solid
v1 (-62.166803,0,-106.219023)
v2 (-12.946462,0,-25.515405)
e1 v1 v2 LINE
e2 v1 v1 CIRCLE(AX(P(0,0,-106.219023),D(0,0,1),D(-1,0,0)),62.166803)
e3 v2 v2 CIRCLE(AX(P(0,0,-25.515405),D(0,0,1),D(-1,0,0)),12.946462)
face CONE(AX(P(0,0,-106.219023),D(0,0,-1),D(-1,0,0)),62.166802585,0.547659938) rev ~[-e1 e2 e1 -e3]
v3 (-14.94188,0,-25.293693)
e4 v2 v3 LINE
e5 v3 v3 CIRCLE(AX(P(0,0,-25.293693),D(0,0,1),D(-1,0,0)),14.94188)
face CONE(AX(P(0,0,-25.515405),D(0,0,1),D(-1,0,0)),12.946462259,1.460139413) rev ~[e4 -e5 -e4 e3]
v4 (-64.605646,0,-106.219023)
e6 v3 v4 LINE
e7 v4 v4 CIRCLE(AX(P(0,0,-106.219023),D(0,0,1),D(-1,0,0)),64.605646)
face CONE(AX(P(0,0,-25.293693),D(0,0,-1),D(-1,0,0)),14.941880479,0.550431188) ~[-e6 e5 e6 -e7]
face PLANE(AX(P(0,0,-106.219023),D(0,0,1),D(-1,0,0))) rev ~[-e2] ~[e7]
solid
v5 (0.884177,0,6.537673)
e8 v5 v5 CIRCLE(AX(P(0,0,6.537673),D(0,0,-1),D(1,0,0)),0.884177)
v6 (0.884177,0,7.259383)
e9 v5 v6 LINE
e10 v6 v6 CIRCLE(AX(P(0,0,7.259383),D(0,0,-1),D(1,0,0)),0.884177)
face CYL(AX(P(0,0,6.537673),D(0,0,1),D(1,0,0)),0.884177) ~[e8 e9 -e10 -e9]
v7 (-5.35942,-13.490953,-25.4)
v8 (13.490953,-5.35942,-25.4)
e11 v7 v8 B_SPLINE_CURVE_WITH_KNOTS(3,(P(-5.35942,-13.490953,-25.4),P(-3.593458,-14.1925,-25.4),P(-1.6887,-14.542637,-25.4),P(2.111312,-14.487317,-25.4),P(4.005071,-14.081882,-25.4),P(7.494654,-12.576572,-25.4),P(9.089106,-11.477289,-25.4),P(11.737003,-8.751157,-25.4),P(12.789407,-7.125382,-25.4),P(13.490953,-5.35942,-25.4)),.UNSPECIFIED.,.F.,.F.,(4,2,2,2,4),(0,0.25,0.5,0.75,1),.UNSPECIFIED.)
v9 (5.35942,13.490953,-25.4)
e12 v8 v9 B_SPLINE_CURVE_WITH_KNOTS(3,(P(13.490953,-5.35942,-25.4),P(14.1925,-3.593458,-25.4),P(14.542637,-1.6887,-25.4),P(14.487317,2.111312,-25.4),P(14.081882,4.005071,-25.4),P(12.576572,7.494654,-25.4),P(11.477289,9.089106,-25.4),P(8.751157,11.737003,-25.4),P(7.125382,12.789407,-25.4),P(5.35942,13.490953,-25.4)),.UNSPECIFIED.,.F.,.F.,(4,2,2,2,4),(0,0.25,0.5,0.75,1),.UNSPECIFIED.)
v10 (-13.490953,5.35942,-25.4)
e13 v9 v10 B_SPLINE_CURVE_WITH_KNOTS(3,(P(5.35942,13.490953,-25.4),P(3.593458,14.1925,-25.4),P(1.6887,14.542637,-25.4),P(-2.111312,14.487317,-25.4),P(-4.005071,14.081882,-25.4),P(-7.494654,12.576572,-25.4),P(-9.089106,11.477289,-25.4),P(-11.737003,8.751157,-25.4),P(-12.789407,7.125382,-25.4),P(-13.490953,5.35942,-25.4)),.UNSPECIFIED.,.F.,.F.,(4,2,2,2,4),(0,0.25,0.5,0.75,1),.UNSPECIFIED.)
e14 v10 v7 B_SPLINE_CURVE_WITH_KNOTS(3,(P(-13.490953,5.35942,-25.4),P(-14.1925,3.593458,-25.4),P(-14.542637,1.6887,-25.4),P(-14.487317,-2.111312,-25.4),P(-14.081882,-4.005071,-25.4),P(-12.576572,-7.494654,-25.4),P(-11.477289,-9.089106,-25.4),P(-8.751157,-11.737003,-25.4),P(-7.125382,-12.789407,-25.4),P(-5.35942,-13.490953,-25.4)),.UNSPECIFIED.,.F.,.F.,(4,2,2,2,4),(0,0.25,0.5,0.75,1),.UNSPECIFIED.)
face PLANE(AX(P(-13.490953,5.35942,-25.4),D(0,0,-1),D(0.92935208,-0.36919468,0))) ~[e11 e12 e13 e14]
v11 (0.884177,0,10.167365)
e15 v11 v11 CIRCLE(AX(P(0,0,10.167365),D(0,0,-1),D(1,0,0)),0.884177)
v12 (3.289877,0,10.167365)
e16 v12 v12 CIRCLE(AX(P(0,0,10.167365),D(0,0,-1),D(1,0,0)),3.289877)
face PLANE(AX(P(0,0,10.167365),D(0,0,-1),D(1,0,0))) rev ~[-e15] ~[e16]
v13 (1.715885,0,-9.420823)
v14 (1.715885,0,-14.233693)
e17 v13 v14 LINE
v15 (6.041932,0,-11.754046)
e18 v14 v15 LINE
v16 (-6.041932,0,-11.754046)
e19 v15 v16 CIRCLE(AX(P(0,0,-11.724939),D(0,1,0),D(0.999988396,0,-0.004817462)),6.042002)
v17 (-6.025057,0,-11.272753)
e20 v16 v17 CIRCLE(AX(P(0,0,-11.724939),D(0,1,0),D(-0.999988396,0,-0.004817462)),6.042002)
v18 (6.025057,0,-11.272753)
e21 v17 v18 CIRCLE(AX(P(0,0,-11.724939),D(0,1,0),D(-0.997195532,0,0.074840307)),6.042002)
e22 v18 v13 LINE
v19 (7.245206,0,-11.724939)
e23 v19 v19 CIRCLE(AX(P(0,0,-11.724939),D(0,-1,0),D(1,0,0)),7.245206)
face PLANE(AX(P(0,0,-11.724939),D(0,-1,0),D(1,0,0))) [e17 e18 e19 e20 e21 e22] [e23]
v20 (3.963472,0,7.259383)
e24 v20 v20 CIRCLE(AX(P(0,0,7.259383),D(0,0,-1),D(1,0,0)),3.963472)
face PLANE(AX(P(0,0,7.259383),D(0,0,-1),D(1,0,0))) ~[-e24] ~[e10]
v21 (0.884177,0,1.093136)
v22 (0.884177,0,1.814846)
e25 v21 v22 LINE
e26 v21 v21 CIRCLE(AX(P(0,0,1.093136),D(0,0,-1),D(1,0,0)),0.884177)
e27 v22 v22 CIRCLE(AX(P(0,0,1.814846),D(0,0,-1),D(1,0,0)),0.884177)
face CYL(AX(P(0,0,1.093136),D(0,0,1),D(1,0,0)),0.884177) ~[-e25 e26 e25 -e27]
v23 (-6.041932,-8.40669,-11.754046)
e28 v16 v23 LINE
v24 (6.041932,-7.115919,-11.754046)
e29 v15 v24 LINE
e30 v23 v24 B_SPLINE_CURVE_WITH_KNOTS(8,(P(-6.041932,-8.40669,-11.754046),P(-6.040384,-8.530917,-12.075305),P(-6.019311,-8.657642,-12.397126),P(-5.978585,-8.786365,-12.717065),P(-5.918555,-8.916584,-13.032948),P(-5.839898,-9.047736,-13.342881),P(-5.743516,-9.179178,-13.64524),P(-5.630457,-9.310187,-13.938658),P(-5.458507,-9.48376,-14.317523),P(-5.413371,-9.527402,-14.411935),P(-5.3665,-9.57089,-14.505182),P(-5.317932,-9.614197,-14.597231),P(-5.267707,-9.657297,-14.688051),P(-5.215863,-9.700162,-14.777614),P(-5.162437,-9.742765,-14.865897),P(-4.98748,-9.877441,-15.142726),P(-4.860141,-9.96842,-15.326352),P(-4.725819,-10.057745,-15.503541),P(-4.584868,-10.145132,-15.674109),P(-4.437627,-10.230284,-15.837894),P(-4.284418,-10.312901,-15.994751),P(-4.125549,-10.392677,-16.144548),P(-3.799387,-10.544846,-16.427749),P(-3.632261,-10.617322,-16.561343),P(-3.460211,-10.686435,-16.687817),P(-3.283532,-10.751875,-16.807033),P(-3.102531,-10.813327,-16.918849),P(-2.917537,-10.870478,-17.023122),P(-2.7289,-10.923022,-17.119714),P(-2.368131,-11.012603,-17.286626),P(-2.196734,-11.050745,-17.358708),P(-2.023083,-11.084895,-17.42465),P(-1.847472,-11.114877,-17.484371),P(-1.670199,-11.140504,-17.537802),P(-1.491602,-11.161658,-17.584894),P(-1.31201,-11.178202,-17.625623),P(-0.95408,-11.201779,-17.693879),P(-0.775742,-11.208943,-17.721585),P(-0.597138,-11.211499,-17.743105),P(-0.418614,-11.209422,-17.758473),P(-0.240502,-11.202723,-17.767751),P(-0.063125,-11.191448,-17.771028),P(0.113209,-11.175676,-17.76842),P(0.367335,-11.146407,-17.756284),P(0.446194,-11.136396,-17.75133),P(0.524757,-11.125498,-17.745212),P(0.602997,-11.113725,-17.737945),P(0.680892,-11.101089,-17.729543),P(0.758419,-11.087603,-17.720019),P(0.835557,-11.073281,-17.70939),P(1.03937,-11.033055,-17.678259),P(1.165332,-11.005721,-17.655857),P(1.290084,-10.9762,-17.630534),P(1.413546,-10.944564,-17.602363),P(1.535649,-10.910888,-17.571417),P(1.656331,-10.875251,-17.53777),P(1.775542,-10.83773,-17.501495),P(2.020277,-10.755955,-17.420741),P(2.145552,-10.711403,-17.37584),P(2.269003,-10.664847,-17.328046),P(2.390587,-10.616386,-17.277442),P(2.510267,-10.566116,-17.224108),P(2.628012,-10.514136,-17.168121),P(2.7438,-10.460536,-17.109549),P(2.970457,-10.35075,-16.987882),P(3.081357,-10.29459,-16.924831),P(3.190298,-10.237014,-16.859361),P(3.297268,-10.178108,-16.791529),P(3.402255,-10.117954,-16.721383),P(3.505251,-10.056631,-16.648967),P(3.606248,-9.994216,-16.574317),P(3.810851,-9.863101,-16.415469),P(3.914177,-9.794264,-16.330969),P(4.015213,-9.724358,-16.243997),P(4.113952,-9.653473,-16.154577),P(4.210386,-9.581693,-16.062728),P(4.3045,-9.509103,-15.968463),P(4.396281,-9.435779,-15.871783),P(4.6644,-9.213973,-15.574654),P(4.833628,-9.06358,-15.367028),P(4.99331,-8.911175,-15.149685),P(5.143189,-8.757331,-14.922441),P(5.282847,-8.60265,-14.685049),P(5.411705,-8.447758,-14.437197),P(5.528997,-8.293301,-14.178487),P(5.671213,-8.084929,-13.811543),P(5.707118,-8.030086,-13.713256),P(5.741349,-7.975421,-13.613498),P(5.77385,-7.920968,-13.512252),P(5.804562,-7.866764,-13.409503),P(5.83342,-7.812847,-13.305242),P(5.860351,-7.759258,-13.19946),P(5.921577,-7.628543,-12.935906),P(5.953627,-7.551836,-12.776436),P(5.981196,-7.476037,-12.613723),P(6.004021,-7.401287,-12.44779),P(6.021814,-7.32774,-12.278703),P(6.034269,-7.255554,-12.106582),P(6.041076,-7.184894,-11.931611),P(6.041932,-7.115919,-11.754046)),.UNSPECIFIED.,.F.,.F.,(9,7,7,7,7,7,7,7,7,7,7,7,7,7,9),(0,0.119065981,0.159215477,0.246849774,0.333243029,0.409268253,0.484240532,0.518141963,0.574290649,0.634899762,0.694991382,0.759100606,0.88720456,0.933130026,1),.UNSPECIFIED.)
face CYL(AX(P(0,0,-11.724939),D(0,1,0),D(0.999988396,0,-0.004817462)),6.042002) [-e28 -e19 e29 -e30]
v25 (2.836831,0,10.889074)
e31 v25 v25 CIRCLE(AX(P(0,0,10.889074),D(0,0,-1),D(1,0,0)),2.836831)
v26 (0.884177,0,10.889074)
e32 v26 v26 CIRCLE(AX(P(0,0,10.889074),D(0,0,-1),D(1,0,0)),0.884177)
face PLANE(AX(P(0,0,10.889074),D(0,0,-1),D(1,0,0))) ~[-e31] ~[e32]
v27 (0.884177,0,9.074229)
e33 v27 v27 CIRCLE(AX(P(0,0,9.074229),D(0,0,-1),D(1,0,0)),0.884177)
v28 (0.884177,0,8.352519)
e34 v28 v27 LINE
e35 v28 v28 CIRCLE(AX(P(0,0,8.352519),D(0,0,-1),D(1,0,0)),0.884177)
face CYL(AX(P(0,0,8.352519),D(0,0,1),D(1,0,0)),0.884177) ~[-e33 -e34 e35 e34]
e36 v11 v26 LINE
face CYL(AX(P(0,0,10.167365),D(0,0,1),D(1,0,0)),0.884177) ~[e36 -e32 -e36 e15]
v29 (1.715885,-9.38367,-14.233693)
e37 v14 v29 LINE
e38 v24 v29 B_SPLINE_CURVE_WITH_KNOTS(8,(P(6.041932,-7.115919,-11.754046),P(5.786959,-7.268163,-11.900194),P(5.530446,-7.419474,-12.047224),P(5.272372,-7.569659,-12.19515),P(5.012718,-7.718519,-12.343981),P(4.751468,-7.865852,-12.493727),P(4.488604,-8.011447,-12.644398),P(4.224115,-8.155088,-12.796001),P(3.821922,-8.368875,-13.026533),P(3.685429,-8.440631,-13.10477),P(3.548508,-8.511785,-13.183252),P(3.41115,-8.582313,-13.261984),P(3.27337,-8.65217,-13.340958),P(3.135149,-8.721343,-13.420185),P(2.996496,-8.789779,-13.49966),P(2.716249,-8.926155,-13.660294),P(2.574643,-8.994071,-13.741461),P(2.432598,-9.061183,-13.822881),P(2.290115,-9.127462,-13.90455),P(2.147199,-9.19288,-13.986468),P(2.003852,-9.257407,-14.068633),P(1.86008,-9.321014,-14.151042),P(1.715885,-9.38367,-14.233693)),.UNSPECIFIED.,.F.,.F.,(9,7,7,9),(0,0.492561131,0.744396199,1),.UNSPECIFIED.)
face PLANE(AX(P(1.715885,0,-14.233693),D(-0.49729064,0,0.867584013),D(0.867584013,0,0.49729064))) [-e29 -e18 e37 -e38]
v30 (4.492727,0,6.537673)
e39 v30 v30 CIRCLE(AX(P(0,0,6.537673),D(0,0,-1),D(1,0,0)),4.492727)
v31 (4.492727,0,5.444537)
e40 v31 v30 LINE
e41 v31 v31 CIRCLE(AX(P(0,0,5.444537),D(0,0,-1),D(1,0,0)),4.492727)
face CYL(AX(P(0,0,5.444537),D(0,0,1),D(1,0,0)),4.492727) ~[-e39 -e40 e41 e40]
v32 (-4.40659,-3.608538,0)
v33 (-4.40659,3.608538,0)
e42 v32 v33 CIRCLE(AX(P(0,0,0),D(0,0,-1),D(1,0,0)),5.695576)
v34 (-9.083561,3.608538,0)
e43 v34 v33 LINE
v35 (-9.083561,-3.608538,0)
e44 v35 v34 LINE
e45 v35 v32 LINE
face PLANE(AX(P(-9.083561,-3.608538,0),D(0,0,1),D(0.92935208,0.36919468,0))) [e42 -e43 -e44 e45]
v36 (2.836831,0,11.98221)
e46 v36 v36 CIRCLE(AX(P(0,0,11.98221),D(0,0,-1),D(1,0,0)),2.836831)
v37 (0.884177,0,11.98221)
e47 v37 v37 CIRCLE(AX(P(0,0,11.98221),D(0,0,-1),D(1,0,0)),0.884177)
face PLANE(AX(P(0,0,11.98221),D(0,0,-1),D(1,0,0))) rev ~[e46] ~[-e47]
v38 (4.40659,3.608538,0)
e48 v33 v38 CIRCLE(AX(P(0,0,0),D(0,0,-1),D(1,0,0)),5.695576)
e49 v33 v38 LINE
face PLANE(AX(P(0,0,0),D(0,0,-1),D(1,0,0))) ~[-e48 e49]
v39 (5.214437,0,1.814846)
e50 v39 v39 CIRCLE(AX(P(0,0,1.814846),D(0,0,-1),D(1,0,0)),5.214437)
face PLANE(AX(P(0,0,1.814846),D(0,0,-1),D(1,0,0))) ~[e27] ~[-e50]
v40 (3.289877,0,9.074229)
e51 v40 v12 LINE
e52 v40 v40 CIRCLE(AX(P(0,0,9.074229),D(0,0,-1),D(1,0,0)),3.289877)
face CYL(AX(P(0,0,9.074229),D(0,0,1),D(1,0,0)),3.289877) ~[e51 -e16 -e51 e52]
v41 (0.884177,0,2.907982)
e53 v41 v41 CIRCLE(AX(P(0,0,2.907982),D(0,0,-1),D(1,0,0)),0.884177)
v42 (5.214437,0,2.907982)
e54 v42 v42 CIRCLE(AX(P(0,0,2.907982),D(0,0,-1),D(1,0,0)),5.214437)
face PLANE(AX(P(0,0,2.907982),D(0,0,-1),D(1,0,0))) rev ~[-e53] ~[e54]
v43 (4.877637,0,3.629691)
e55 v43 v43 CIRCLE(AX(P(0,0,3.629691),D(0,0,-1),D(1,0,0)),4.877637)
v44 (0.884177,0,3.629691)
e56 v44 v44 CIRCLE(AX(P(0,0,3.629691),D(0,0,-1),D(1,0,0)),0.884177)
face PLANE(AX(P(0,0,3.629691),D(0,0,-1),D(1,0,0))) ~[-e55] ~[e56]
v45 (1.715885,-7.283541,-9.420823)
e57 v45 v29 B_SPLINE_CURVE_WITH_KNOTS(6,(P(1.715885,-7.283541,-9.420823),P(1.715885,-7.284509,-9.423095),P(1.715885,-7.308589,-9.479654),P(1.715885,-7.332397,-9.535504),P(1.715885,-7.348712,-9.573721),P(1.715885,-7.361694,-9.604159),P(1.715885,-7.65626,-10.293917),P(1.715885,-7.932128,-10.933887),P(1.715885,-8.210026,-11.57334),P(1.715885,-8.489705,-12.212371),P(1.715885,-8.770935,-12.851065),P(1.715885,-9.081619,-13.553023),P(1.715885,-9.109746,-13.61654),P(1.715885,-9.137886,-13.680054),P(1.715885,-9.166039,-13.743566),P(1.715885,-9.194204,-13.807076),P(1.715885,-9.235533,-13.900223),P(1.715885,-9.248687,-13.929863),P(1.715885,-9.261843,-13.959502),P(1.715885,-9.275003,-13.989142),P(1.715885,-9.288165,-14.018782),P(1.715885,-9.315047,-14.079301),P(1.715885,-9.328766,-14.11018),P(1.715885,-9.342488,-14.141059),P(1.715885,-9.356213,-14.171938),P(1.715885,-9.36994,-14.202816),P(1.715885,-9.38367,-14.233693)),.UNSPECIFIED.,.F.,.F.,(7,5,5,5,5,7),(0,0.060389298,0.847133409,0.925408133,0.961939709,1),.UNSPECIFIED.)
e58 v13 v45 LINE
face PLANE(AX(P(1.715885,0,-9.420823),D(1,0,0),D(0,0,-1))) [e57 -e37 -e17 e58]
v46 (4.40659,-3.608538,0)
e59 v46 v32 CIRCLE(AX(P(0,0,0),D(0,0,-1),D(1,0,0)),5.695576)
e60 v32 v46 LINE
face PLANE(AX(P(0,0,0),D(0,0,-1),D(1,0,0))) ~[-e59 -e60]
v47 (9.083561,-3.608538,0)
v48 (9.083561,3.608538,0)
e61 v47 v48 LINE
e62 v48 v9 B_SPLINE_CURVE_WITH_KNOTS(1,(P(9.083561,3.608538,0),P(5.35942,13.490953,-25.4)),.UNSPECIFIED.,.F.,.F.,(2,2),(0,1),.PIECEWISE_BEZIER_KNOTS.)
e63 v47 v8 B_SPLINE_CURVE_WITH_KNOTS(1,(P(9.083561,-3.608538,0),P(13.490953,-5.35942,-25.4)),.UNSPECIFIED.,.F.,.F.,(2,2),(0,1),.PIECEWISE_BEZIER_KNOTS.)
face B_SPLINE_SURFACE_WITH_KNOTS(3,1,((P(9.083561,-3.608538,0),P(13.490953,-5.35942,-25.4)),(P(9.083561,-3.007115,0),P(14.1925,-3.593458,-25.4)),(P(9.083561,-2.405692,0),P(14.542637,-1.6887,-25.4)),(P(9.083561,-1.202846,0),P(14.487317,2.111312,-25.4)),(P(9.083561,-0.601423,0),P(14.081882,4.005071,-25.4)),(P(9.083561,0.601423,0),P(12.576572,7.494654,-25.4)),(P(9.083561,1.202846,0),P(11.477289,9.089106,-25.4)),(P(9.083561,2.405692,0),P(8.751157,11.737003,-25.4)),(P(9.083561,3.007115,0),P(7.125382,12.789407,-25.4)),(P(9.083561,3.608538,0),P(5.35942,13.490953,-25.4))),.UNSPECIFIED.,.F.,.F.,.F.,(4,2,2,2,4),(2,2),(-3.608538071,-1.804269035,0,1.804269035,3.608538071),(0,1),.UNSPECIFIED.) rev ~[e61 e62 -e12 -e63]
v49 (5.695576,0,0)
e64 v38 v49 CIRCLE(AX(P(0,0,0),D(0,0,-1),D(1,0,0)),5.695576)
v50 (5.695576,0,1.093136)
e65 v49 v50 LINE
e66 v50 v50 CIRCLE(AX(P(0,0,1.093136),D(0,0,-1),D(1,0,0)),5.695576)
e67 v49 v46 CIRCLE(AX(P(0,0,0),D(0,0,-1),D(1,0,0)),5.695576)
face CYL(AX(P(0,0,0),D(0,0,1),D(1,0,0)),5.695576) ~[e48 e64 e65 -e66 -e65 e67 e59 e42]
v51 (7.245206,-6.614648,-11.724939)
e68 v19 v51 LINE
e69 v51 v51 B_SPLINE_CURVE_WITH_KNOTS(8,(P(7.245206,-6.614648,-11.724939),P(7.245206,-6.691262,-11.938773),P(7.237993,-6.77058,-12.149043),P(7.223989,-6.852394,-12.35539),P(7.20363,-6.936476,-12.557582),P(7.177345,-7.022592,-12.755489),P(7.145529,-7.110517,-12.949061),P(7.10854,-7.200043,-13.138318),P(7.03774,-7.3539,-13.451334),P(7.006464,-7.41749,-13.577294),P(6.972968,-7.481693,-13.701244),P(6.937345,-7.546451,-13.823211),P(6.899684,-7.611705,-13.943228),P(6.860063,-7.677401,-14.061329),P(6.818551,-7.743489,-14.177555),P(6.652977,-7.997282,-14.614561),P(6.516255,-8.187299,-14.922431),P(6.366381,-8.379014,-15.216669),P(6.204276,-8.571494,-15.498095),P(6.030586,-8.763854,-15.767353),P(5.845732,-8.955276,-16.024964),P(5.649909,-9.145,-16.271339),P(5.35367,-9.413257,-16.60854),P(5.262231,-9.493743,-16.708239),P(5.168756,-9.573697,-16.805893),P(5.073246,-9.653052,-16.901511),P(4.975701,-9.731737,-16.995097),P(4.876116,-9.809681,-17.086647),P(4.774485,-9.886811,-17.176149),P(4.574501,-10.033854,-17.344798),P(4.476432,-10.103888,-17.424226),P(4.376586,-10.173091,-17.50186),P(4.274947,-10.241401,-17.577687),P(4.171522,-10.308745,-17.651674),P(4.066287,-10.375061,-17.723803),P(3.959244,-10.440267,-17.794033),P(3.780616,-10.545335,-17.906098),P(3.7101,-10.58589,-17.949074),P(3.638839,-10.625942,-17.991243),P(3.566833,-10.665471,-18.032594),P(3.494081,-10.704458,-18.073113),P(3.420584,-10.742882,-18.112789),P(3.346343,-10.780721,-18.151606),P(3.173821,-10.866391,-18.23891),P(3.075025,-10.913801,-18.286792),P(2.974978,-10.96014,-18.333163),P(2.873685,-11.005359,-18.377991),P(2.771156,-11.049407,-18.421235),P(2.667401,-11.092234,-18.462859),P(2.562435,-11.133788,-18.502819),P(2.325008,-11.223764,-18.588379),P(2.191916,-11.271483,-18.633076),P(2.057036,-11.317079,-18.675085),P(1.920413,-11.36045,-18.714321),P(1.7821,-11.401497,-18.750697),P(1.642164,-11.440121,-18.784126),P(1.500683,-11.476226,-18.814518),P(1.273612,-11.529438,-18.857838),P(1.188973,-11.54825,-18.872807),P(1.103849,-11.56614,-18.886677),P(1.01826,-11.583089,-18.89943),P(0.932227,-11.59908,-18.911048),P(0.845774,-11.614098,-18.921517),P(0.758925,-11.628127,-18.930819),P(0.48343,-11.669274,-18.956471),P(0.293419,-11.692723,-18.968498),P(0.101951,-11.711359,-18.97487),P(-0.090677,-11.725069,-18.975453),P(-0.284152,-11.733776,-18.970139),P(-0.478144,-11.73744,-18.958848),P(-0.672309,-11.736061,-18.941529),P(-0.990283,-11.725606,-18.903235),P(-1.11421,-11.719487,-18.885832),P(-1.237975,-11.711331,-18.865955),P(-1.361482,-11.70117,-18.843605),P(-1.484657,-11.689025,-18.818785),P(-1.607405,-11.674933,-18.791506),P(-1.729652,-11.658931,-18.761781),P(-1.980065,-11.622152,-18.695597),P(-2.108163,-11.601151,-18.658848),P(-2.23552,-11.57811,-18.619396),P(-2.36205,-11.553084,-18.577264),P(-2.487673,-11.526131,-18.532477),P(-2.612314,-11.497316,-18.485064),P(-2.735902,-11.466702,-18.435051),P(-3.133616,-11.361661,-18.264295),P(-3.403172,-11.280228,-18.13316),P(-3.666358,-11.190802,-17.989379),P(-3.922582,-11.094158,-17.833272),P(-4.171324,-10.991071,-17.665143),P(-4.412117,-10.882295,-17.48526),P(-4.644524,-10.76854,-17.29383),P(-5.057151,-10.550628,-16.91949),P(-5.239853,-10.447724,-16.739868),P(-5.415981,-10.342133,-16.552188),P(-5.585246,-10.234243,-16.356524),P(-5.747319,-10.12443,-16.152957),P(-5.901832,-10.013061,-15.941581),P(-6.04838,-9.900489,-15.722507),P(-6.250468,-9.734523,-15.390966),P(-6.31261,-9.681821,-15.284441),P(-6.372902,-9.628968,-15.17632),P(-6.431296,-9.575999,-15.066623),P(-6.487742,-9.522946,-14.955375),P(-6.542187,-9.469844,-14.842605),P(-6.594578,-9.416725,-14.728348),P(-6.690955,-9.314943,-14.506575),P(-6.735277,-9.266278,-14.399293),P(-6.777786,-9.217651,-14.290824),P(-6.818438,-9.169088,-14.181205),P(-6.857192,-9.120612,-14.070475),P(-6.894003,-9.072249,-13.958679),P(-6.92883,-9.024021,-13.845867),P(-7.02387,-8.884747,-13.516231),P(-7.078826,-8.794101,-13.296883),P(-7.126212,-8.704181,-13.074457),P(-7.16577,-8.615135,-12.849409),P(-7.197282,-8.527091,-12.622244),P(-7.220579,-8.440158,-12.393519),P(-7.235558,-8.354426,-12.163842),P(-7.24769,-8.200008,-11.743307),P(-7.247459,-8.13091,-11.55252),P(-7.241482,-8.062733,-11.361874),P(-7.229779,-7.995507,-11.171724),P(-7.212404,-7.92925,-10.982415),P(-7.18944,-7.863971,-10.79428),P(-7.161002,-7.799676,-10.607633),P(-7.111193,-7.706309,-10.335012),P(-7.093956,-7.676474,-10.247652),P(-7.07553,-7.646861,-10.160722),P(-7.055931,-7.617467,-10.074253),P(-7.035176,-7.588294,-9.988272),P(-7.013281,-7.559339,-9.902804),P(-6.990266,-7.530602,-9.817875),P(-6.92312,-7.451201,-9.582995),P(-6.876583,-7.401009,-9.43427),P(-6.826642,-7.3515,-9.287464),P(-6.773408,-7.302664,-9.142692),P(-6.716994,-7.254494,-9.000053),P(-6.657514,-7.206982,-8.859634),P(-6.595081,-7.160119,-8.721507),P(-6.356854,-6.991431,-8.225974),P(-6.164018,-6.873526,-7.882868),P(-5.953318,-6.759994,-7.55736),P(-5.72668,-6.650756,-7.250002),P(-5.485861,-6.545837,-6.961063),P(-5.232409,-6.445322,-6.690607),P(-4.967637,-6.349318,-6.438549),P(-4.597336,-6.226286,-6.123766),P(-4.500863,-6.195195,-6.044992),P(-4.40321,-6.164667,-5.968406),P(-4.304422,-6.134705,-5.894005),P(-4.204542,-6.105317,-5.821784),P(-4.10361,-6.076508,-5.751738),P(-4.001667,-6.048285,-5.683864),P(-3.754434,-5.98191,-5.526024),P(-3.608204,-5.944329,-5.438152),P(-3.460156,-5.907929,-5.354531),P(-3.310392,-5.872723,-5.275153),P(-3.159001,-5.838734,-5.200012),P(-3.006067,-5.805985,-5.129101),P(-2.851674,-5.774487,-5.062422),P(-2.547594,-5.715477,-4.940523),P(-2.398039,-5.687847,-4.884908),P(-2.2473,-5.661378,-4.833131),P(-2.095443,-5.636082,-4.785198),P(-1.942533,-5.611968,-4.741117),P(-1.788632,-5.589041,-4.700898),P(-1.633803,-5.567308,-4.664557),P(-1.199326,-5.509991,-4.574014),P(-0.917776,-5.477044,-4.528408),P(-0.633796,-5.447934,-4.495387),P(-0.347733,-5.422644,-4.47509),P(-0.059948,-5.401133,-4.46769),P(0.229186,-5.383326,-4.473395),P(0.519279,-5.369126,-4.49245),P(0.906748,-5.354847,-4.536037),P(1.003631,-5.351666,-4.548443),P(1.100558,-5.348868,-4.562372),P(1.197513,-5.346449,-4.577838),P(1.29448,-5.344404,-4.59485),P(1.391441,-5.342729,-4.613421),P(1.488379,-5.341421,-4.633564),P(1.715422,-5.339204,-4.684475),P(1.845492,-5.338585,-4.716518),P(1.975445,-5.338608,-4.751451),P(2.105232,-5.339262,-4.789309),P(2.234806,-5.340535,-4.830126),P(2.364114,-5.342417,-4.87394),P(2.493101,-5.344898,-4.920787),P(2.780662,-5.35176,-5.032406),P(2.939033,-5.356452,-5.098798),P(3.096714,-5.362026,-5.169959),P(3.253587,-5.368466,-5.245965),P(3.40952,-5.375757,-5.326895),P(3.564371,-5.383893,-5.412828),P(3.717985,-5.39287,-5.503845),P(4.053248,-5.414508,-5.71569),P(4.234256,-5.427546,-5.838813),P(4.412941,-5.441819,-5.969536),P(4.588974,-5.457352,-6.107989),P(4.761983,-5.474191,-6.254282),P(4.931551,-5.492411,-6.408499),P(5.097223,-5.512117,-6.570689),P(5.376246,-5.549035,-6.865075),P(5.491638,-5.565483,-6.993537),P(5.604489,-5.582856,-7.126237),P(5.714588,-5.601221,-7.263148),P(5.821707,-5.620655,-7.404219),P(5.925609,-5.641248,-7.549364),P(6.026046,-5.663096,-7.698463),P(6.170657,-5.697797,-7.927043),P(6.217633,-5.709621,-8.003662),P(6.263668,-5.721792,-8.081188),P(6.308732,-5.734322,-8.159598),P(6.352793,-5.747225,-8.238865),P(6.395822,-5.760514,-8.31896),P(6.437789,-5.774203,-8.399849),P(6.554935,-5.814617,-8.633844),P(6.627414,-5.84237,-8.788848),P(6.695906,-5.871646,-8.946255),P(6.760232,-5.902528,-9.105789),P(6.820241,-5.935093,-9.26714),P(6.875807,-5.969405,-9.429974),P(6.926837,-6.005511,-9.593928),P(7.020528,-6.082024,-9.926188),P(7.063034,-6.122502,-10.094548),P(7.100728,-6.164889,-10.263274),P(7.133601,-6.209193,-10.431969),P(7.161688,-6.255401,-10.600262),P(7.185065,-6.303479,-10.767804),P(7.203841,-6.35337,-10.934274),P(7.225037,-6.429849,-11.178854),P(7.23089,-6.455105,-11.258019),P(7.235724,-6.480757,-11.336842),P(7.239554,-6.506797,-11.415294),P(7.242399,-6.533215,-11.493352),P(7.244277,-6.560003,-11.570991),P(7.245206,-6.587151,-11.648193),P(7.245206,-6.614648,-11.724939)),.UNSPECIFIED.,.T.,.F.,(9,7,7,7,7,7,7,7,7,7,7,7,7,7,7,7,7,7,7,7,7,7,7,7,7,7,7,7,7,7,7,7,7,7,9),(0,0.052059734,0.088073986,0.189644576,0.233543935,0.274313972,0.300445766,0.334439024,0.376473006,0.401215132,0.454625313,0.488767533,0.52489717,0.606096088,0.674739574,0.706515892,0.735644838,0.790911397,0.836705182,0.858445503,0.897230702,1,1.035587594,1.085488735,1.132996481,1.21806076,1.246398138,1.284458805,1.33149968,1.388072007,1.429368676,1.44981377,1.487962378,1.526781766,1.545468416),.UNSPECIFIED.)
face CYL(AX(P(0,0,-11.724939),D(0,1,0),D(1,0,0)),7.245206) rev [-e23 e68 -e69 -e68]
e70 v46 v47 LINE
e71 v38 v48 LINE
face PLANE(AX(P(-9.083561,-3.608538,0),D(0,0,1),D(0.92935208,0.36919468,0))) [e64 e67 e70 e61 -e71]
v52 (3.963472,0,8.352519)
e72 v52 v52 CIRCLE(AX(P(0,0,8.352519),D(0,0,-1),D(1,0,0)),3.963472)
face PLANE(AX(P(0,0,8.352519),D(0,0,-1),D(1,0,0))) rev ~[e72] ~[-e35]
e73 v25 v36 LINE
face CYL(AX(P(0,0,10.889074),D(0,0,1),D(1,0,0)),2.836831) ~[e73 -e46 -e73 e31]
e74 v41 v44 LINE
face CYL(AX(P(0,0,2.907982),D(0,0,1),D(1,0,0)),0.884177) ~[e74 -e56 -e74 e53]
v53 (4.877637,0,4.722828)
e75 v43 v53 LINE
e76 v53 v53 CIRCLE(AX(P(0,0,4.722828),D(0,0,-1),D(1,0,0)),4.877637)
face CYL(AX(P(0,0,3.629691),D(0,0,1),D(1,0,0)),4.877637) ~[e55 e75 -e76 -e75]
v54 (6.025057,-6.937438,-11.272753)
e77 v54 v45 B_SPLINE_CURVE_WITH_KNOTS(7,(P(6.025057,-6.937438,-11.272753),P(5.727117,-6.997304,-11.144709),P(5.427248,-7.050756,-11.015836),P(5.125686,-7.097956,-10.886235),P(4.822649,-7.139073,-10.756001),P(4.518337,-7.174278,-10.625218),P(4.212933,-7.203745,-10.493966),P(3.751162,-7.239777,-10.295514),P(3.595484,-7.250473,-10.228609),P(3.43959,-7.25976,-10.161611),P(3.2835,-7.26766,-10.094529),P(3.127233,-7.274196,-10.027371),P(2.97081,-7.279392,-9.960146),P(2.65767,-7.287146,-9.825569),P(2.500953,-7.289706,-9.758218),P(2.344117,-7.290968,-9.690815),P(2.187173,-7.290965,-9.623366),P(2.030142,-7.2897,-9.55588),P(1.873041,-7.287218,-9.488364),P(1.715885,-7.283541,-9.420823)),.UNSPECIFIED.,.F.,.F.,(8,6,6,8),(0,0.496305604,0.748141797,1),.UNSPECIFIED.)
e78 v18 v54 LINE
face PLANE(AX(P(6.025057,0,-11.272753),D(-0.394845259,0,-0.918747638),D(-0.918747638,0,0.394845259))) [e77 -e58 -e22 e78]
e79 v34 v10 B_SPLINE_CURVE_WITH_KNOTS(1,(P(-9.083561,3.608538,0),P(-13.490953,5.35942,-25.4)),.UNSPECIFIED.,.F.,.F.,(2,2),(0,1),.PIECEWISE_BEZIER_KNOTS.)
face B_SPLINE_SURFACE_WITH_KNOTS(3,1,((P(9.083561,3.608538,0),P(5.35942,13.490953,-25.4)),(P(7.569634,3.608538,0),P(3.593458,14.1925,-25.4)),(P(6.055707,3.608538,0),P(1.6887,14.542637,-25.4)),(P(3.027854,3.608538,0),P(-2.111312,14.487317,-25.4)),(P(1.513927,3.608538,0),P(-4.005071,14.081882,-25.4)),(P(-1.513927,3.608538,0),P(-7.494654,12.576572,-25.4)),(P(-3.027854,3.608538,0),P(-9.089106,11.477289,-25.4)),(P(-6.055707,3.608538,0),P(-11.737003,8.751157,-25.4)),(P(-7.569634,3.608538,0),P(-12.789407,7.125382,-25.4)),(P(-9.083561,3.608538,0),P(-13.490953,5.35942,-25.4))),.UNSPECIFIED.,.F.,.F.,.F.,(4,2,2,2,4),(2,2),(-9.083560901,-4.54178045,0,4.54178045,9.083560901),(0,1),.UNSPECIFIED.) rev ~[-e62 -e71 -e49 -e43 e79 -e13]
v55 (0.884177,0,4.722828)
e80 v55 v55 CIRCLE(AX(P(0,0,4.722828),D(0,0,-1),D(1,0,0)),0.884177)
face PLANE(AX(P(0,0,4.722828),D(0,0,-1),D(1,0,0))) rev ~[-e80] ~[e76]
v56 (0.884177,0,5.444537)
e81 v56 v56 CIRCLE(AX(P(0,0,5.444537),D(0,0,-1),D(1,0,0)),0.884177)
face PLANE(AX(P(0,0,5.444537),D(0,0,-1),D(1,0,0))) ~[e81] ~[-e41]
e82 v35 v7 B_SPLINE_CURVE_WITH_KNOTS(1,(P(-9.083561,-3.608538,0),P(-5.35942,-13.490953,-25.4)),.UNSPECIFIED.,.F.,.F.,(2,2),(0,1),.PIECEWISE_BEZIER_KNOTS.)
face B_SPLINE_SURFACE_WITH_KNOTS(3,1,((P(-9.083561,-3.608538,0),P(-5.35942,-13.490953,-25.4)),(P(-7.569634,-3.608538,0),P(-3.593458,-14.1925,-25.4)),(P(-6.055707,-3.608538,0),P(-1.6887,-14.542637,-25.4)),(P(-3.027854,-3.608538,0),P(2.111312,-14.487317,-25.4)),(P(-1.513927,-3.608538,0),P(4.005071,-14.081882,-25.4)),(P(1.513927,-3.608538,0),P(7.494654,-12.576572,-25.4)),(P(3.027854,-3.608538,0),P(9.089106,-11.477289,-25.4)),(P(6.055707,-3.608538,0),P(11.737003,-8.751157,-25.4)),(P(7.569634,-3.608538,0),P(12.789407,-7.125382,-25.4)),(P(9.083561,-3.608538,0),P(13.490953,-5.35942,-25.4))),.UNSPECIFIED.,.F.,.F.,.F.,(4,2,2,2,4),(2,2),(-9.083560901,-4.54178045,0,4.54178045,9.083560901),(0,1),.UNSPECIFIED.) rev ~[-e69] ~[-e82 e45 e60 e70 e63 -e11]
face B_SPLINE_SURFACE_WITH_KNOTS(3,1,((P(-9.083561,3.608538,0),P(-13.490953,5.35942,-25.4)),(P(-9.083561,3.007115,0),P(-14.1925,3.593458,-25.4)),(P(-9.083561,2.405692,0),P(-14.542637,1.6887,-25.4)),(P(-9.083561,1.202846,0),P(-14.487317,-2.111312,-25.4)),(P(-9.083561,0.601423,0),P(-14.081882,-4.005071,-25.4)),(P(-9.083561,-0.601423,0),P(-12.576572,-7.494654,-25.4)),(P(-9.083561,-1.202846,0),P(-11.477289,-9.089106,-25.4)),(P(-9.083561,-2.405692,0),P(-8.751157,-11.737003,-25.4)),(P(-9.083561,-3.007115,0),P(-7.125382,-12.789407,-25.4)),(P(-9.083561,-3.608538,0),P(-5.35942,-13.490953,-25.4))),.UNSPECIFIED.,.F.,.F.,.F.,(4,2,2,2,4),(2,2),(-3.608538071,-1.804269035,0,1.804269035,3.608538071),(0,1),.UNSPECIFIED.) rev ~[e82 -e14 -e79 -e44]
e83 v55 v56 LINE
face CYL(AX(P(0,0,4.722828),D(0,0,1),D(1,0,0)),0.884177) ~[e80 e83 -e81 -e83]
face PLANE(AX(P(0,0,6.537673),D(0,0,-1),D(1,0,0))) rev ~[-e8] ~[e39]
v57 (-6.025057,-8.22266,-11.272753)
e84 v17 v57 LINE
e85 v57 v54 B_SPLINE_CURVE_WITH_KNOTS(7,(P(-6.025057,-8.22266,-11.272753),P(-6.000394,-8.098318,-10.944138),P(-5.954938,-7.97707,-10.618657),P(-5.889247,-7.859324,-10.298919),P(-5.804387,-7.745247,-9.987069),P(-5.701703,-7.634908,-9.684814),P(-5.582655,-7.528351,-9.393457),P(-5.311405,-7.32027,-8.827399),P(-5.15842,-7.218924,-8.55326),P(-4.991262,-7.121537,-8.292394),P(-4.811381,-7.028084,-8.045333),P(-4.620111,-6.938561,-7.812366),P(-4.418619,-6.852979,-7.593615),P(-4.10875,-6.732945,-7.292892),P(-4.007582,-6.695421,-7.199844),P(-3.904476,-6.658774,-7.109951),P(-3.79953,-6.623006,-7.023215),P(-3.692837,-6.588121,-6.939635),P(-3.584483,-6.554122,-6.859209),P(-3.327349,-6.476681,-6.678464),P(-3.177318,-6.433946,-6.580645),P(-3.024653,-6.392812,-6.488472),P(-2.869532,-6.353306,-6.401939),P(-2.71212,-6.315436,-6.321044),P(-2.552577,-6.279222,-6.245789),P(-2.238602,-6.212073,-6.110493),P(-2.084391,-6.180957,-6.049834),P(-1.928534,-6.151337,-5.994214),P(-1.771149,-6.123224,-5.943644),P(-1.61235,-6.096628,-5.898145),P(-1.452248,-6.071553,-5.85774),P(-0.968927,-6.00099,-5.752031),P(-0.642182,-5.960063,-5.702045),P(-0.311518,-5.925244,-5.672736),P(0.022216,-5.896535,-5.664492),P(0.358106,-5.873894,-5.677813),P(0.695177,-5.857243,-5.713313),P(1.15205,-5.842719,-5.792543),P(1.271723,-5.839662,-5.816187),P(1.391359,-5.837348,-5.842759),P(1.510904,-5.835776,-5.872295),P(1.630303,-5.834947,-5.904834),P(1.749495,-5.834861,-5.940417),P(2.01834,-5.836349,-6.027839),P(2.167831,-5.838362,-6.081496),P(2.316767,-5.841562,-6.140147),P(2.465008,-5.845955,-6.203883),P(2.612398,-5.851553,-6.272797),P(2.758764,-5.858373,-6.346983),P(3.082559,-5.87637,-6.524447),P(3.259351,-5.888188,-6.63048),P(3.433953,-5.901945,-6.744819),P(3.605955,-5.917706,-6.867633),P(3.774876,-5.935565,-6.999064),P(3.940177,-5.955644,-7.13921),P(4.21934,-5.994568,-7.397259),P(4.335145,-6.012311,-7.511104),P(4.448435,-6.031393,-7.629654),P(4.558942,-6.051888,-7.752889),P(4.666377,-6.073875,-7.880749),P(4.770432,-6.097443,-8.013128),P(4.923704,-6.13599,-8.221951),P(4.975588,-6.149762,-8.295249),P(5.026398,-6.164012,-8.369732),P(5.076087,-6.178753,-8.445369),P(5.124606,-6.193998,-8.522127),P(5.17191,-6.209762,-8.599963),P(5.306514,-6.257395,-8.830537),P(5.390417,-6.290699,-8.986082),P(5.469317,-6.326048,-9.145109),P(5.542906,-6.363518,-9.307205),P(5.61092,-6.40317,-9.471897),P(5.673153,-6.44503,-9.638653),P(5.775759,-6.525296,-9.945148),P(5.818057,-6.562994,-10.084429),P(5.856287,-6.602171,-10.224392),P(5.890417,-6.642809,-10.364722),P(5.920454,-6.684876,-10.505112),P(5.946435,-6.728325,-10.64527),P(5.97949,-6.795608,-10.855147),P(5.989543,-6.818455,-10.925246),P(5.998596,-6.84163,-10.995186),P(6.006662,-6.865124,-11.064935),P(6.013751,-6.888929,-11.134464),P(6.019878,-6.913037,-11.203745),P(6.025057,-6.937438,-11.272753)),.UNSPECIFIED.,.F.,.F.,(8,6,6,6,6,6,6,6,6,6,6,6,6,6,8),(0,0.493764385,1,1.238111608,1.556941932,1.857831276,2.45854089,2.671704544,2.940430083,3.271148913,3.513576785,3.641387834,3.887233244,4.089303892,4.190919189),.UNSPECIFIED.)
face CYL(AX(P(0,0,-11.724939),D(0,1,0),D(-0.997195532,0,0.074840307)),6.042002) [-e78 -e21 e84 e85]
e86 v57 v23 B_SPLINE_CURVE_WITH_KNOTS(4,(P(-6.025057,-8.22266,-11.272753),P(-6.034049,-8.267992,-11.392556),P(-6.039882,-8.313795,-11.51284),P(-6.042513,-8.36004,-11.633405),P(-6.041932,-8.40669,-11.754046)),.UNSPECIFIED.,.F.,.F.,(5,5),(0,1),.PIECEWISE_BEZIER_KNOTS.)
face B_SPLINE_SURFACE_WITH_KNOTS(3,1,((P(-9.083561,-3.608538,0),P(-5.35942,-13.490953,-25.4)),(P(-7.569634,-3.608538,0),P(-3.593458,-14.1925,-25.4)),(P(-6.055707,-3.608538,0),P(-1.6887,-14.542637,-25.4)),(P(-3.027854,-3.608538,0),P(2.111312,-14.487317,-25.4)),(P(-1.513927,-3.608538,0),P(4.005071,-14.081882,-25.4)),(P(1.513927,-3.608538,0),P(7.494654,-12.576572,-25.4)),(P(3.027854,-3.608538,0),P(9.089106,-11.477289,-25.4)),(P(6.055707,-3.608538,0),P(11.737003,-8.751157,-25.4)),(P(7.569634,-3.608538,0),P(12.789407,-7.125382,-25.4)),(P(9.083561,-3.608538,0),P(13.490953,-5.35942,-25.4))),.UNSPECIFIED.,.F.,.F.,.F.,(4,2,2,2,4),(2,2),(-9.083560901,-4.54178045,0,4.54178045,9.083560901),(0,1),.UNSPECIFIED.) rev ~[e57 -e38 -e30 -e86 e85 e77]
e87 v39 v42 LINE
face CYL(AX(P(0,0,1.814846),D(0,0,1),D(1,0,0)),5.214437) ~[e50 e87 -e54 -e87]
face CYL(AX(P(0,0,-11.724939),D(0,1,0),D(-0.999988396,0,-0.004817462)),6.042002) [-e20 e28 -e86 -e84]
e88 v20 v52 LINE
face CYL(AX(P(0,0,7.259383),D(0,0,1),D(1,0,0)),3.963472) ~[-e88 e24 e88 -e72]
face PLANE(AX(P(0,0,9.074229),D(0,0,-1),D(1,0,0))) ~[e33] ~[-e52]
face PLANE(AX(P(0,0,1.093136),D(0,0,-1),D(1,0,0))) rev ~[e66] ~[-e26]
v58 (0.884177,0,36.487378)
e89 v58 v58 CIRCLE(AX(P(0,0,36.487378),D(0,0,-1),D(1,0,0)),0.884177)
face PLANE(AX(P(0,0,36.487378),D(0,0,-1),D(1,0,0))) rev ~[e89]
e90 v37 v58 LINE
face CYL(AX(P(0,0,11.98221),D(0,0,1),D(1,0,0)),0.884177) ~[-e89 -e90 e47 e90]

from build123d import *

# Parameters (mm, degrees)
F0_W     = 18.1671218015
F0_H     = 7.2170761414
F8_R     = 7.2452056649
F9_DEPTH = 12.7


# Not quite as in the source:
# - the arcs of a loft's sections are written as splines that run evenly, so that the points pair up as in the source's solid


with BuildPart() as f3:
    # F0 (on Top) → F3 section 0
    with BuildSketch(Plane.XY):
        Rectangle(F0_W, F0_H)
    # F2 (on offset) → F3 section 1
    with BuildSketch(Plane.XY.offset(-25.4)):
        with BuildLine():
            add(Edge.make_bspline(
                [(-13.4909534727, 5.359420138), (-14.1924999283, 3.593458458), (-14.5426369472, 1.6887002477), (-14.4873172157, -2.1113118661), (-14.0818822313, -4.0050706272), (-12.5765717848, -7.4946540977), (-11.4772885982, -9.0891058051), (-8.7511573067, -11.7370031821), (-7.125381818, -12.7894070172), (-5.359420138, -13.4909534727)],
                knots=[0, 0, 0, 0, 0.25, 0.25, 0.5, 0.5, 0.75, 0.75, 1, 1, 1, 1], degree=3))
            add(Edge.make_bspline(
                [(-5.359420138, -13.4909534727), (-3.593458458, -14.1924999283), (-1.6887002477, -14.5426369472), (2.1113118661, -14.4873172157), (4.0050706272, -14.0818822313), (7.4946540977, -12.5765717848), (9.0891058051, -11.4772885982), (11.7370031821, -8.7511573067), (12.7894070172, -7.125381818), (13.4909534727, -5.359420138)],
                knots=[0, 0, 0, 0, 0.25, 0.25, 0.5, 0.5, 0.75, 0.75, 1, 1, 1, 1], degree=3))
            add(Edge.make_bspline(
                [(13.4909534727, -5.359420138), (14.1924999283, -3.593458458), (14.5426369472, -1.6887002477), (14.4873172157, 2.1113118661), (14.0818822313, 4.0050706272), (12.5765717848, 7.4946540977), (11.4772885982, 9.0891058051), (8.7511573067, 11.7370031821), (7.125381818, 12.7894070172), (5.359420138, 13.4909534727)],
                knots=[0, 0, 0, 0, 0.25, 0.25, 0.5, 0.5, 0.75, 0.75, 1, 1, 1, 1], degree=3))
            add(Edge.make_bspline(
                [(5.359420138, 13.4909534727), (3.593458458, 14.1924999283), (1.6887002477, 14.5426369472), (-2.1113118661, 14.4873172157), (-4.0050706272, 14.0818822313), (-7.4946540977, 12.5765717848), (-9.0891058051, 11.4772885982), (-11.7370031821, 8.7511573067), (-12.7894070172, 7.125381818), (-13.4909534727, 5.359420138)],
                knots=[0, 0, 0, 0, 0.25, 0.25, 0.5, 0.5, 0.75, 0.75, 1, 1, 1, 1], degree=3))
        make_face()
    loft(ruled=True)

    # F6 (on Front) → F7 (revolve)
    with BuildSketch(Plane.XZ):
        Polygon((0.8841773961, 36.48737818), (0, 36.48737818), (0, -4.7170827165), (1.1227278737, -4.7170827165), (2.8959631454, -0.8159647114), (0.8841773961, -0.8159647114), (0.8841773961, 0), (5.6955757318, 0), (5.6955757318, 1.0931361467), (0.8841773961, 1.0931361467), (0.8841773961, 1.8148457166), (5.2144367946, 1.8148457166), (5.2144367946, 2.9079818632), (0.8841773961, 2.9079818632), (0.8841773961, 3.6296914332), (4.8776374315, 3.6296914332), (4.8776374315, 4.7228275798), (0.8841773961, 4.7228275798), (0.8841773961, 5.4445371497), (4.4927265262, 5.4445371497), (4.4927265262, 6.5376732964), (0.8841773961, 6.5376732964), (0.8841773961, 7.2593828663), (3.9634722052, 7.2593828663), (3.9634722052, 8.352519013), (0.8841773961, 8.352519013), (0.8841773961, 9.0742285829), (3.2898765639, 9.0742285829), (3.2898765639, 10.1673647296), (0.8841773961, 10.1673647296), (0.8841773961, 10.8890742995), (2.8368307394, 10.8890742995), (2.8368307394, 11.9822104461), (0.8841773961, 11.9822104461), align=None)
    revolve(axis=Axis((0, 0, 24.3908111006), (0, 0, -1)))

    # F8 (on Front) → F9 (cut)
    with BuildSketch(Plane.XZ):
        with Locations((0, -11.7249386385)):
            Circle(F8_R)
        with BuildLine():
            ThreePointArc((6.0419317468, -11.7540457542), (0, -17.7669404969), (-6.0419317468, -11.7540457542))
            ThreePointArc((-6.0419317468, -11.7540457542), (-6.0382916863, -11.5132313675), (-6.0250572559, -11.2727533669))
            ThreePointArc((-6.0250572559, -11.2727533669), (0, -5.6829367801), (6.0250572559, -11.2727533669))
            Line((6.0250572559, -11.2727533669), (1.7158846604, -9.4208233058))
            Line((1.7158846604, -9.4208233058), (1.7158846604, -14.2336934805))
            Line((1.7158846604, -14.2336934805), (6.0419317468, -11.7540457542))
        make_face(mode=Mode.SUBTRACT)
    extrude(amount=F9_DEPTH, mode=Mode.SUBTRACT)


with BuildPart() as f5:
    # F4 (on Front) → F5 (revolve)
    with BuildSketch(Plane.XZ):
        Polygon((-12.9464622587, -25.5154054612), (-14.9418804795, -25.2936929464), (-64.6056458354, -106.2190234661), (-62.1668025851, -106.2190234661), align=None)
    revolve(axis=Axis((0, 0, -68.527775351), (0, 0, 1)))


solid = Compound([f3.part, f5.part])
